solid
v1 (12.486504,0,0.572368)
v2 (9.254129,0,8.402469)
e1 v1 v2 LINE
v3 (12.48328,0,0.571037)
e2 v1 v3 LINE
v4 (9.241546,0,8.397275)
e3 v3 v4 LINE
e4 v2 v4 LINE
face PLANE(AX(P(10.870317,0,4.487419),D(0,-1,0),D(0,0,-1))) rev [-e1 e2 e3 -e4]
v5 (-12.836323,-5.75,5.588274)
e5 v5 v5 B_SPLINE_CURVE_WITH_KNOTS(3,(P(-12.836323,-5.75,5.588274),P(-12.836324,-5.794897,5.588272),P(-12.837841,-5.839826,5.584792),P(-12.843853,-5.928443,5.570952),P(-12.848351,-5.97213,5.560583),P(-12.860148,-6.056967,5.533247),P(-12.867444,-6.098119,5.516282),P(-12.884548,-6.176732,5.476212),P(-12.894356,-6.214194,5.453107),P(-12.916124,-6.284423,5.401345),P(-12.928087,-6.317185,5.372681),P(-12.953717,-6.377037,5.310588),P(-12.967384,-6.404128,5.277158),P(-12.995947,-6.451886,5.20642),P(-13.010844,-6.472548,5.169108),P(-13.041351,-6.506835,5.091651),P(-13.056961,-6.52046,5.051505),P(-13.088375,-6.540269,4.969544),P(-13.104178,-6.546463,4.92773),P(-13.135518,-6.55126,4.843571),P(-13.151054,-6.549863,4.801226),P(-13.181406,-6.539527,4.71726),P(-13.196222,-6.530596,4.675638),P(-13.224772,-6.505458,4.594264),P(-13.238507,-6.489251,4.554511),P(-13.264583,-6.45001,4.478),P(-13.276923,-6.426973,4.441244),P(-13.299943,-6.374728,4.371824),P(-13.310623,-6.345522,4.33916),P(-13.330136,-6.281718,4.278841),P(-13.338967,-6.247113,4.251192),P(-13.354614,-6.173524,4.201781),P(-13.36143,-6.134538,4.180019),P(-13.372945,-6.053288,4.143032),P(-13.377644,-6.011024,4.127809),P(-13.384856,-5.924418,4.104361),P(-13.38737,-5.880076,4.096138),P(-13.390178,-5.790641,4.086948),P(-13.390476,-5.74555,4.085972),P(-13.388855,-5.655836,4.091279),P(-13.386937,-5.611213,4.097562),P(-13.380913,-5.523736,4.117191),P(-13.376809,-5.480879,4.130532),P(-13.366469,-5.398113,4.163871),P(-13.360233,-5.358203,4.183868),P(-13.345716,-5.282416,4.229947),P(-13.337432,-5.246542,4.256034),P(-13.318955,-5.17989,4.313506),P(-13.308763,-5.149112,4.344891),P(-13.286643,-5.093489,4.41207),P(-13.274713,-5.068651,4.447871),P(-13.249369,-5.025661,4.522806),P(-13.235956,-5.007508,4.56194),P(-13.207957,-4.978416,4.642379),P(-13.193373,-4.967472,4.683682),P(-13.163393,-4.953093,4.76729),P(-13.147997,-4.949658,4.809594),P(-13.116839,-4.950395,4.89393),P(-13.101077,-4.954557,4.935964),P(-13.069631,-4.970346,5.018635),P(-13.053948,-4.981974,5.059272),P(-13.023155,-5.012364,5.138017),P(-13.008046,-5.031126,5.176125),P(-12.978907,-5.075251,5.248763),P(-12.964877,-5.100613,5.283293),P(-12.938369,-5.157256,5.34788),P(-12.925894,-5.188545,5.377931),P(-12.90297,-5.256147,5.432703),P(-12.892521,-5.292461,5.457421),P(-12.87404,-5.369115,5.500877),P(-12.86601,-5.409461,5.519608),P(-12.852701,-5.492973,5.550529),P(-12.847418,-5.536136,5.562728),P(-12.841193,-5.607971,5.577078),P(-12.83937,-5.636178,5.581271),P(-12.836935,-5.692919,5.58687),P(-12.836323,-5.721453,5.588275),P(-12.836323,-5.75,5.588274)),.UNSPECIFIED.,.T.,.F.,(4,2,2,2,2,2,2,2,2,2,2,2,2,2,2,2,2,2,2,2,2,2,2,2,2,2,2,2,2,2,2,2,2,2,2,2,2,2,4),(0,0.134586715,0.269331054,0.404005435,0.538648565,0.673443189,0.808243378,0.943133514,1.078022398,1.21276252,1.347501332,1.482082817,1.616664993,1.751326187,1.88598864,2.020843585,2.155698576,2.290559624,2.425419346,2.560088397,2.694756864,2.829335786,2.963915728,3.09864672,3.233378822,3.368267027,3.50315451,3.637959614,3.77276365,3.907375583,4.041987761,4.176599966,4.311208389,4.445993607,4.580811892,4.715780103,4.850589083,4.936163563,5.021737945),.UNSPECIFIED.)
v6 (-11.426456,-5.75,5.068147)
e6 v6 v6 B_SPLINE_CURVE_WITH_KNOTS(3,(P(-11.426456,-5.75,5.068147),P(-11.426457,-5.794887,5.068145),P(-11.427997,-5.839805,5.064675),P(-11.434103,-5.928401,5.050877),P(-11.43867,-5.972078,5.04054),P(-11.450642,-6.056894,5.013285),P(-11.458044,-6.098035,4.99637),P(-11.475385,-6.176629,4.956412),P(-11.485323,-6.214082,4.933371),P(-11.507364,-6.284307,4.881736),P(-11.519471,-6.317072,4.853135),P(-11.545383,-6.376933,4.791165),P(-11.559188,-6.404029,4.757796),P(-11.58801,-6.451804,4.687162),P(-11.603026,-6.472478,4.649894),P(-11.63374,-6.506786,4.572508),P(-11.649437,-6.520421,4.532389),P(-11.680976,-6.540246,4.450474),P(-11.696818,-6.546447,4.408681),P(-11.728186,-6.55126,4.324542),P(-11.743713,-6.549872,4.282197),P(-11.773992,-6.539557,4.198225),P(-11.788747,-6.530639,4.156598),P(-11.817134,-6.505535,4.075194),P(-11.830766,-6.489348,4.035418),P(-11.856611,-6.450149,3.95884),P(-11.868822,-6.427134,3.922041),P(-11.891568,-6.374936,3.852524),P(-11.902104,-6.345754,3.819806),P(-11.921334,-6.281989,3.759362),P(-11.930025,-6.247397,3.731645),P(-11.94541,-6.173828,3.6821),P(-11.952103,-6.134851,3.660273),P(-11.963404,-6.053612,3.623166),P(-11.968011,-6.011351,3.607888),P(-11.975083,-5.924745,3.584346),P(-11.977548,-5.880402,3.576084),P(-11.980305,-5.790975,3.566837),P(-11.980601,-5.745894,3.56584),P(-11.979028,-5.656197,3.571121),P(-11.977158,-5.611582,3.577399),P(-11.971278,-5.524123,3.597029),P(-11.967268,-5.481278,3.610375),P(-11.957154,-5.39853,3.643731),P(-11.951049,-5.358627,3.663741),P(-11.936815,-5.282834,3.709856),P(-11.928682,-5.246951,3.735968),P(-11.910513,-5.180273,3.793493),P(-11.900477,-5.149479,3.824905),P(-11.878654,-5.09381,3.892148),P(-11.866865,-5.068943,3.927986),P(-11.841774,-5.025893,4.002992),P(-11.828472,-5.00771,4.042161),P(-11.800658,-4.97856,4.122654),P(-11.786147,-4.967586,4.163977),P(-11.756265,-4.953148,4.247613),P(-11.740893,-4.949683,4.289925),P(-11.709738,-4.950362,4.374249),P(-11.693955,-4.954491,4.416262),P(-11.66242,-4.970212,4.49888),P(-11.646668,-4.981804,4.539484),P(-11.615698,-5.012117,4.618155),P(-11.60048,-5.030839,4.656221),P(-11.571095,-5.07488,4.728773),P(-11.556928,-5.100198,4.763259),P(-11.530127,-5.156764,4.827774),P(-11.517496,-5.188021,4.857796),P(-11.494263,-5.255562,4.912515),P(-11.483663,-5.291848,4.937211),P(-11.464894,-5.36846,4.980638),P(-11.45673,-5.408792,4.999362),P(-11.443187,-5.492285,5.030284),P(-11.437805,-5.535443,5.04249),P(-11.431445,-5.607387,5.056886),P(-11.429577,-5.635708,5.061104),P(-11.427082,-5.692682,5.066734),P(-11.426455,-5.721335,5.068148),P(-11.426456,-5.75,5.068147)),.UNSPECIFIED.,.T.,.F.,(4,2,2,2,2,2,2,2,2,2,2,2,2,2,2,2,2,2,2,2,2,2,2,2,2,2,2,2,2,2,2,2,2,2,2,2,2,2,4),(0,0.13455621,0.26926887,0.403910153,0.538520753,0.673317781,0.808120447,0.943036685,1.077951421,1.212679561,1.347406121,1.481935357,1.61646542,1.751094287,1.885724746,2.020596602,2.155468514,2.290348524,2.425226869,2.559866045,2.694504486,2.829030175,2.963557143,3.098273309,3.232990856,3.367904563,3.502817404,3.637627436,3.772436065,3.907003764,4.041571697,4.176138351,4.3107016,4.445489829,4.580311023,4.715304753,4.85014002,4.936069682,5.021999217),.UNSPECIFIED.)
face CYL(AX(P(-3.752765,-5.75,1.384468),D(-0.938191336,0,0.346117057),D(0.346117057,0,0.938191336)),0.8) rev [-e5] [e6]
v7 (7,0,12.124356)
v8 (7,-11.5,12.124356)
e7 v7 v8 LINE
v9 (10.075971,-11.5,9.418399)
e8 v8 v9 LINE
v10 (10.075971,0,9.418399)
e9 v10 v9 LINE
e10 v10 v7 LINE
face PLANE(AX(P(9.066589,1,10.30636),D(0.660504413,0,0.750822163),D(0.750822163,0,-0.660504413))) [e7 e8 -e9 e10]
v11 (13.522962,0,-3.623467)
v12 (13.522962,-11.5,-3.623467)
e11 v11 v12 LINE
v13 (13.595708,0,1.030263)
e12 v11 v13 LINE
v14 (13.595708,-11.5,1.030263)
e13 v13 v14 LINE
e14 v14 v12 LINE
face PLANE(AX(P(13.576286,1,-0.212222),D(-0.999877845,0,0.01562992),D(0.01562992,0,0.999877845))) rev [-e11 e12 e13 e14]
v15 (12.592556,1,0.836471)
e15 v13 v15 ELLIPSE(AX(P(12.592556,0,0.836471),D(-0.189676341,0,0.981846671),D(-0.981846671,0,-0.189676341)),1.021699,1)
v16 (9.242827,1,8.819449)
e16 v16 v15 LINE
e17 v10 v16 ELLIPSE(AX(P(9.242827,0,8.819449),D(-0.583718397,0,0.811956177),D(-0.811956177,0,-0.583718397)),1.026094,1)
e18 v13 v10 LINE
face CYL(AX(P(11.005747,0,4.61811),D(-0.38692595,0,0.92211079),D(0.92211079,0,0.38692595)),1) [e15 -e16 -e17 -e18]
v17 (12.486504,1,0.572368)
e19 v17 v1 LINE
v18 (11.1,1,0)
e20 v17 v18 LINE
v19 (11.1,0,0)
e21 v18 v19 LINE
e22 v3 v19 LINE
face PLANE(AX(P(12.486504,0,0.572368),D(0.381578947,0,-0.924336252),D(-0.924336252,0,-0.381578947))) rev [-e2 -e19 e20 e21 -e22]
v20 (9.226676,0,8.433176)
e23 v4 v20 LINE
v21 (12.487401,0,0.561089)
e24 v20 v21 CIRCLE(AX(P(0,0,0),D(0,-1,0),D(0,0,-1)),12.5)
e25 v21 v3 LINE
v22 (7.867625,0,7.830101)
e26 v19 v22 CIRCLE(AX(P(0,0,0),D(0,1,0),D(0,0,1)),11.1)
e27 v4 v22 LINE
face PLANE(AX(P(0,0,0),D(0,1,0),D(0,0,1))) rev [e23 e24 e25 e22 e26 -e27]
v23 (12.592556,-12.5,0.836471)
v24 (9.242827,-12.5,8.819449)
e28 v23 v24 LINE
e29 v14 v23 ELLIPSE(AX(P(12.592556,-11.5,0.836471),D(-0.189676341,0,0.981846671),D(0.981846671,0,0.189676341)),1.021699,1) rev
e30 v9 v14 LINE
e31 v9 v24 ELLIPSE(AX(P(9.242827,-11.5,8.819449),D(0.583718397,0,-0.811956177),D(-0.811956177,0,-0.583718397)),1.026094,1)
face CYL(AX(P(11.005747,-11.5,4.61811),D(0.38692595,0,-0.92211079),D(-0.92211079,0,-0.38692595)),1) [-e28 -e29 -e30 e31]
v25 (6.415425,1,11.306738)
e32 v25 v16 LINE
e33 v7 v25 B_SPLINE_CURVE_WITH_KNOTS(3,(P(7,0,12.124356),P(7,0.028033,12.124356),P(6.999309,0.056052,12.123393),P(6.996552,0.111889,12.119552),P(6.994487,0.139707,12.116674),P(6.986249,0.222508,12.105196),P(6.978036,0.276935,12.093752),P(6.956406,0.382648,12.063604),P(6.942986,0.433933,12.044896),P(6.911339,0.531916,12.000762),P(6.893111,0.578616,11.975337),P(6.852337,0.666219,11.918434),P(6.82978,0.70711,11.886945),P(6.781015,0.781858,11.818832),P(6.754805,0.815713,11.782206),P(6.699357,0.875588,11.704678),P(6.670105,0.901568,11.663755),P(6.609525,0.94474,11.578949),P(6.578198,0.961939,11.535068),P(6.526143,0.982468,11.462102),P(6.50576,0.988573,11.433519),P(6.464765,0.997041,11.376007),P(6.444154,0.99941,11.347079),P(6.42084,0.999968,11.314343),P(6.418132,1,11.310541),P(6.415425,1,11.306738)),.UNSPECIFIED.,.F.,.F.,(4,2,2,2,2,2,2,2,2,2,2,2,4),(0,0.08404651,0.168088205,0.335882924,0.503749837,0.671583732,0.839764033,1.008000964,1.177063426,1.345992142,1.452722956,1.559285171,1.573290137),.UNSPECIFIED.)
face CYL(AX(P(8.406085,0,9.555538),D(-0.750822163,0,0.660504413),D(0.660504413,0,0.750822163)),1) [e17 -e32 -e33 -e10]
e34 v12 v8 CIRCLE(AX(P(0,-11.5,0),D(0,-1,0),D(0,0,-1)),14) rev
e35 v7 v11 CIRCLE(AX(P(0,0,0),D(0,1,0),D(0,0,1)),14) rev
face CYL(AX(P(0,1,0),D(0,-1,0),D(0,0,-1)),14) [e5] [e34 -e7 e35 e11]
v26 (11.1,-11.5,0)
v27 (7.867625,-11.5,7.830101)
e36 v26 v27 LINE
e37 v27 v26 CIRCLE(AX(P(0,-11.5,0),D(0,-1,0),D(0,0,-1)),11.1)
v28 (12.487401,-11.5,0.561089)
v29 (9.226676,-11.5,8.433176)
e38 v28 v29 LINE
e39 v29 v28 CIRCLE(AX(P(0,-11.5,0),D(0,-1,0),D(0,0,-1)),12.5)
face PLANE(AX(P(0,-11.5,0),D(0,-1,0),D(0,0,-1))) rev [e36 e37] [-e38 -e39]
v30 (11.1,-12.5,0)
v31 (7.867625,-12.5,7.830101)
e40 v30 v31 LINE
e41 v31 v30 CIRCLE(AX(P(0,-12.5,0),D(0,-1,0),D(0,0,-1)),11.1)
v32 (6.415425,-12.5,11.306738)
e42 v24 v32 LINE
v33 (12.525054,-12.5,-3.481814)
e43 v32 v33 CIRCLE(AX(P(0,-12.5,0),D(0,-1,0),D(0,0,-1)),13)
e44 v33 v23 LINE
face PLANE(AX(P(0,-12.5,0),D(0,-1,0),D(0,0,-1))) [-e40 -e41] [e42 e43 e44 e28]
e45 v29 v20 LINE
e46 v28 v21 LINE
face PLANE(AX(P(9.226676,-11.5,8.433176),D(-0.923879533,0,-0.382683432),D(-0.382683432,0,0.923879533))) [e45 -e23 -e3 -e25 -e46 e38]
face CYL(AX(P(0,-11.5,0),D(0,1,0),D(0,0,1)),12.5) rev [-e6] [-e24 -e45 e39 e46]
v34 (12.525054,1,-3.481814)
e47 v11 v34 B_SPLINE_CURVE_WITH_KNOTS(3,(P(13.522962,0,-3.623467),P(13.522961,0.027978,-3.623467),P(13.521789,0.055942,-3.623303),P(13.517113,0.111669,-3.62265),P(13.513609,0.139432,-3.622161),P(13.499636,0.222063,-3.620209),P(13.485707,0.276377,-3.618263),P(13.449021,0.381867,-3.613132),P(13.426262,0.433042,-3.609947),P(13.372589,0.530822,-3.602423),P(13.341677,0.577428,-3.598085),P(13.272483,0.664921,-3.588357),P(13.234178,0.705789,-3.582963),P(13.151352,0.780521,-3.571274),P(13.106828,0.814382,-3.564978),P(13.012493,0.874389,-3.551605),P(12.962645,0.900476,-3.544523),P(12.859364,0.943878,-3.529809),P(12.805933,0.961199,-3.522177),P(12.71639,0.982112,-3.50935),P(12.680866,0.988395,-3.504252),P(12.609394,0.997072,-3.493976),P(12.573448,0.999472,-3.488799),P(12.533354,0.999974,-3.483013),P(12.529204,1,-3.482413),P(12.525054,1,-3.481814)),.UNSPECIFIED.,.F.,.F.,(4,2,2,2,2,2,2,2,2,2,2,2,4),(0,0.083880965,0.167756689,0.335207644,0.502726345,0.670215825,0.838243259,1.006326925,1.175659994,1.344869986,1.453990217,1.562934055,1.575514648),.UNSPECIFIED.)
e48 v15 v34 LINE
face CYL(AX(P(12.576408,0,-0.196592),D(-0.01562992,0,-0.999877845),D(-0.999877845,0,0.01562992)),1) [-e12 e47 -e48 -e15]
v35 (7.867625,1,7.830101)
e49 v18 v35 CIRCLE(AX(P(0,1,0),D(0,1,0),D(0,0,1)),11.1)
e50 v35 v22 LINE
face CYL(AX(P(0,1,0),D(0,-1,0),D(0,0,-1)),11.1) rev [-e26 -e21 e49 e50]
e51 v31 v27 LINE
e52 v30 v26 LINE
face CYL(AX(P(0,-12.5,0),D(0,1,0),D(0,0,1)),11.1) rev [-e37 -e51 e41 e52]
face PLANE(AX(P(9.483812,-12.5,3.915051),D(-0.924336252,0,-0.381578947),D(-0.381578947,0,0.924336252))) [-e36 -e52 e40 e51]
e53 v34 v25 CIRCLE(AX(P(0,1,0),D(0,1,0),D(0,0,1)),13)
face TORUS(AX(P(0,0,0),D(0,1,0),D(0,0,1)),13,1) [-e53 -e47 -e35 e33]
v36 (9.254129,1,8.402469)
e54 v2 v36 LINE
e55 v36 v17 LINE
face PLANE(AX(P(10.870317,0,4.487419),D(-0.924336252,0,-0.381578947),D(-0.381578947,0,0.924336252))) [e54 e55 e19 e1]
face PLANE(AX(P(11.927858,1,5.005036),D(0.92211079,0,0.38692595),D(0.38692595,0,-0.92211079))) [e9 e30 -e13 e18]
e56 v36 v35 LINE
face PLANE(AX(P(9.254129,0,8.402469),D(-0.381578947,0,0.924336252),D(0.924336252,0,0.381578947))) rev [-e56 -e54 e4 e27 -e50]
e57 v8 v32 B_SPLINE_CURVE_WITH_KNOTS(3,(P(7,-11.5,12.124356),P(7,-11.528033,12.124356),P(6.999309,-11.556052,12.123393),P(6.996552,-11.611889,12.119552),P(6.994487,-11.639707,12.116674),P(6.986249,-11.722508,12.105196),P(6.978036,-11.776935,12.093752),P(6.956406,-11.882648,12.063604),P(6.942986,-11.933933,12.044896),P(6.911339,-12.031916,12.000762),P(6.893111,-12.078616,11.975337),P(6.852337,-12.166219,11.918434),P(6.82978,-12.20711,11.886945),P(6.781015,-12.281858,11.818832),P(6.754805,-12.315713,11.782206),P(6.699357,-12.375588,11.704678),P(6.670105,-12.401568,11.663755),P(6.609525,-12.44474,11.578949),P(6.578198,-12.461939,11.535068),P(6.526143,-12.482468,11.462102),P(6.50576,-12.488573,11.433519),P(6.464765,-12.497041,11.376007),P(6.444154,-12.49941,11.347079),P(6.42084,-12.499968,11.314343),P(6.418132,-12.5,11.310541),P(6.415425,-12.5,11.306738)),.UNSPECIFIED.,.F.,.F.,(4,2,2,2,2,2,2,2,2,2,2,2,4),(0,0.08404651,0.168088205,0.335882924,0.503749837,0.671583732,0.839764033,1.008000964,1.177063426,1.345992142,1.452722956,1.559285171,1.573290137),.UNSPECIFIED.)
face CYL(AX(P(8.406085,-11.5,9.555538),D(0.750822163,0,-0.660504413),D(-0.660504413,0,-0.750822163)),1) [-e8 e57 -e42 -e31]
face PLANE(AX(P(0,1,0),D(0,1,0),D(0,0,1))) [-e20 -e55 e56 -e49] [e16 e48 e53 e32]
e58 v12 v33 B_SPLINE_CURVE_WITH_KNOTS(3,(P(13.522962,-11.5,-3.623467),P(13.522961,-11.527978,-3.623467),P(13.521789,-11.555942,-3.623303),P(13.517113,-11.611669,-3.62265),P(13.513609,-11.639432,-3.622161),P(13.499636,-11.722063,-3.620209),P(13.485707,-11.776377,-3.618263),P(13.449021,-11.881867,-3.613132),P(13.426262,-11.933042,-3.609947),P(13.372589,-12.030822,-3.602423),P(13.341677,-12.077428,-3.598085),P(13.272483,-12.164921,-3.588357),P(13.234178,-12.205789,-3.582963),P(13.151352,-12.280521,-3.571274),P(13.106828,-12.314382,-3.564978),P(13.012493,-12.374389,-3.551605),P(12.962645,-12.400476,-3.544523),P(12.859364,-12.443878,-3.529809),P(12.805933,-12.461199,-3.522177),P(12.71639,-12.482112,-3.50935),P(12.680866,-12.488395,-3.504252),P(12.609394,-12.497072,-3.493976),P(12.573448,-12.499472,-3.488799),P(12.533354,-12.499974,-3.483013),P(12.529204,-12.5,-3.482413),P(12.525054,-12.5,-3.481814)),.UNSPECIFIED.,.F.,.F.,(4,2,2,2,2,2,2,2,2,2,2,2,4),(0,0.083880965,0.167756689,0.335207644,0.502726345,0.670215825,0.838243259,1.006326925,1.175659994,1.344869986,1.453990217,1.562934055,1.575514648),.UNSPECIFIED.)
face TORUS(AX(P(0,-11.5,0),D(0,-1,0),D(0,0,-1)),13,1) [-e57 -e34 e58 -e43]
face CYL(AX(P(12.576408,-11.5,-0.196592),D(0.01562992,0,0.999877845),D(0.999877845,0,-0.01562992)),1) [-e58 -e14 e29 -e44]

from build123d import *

# Parameters (mm, degrees)
EXTRUDE_1_DEPTH     = 1
EXTRUDE_START       = 11.5
EXTRUDE_3_DEPTH     = 11.5
EXTRUDE_START_2     = 1
EXTRUDE_4_DEPTH     = 1
FILLET_1_R          = 1
FILLET_2_R          = 1
SKETCH_7_W          = 8.471052631578948
SKETCH_7_H          = 1
CUT_EXTRUDE_1_DEPTH = 1.5
SKETCH2_R           = 0.8000000000000002
CUT_EXTRUDE1_DEPTH  = 10


with BuildPart() as part:
    # 草图1 → 凸台-拉伸1 (new body)
    with BuildSketch(Plane(origin=(0, 0, 0), x_dir=(1, 0, 0), z_dir=(0, 1, 0))):
        with BuildLine():
            Line((13.595707880639235, -1.030263157894738), (10.075971038533972, -9.418398712579371))
            Line((10.075971038533972, -9.418398712579371), (7, -12.12435565298214))
            ThreePointArc((7, -12.12435565298214), (-12.93431345515802, 5.357568053111247), (13.522961568046952, 3.6234666314353032))
            Line((13.522961568046952, 3.6234666314353032), (13.595707880639235, -1.030263157894738))
        make_face()
        with BuildLine():
            Line((11.1, 0), (7.867624653739615, -7.830101040718992))
            ThreePointArc((7.867624653739615, -7.830101040718992), (-10.260132398183506, 4.235526315789474), (11.1, 0))
        make_face(mode=Mode.SUBTRACT)
    extrude(amount=EXTRUDE_1_DEPTH)

    # 草图2 → 凸台-拉伸3 (add)
    with BuildSketch(Plane(origin=(0, 0, 0), x_dir=(-1, 0, 0), z_dir=(0, -1, 0)).offset(EXTRUDE_START)):
        with BuildLine():
            Line((-13.595707880639234, -1.030263157894738), (-13.52296156804698, 3.6234666314351993))
            ThreePointArc((-13.52296156804698, 3.6234666314351993), (12.934313455157998, 5.357568053111296), (-7, -12.12435565298214))
            Line((-7, -12.12435565298214), (-10.07597103853397, -9.418398712579371))
            Line((-10.07597103853397, -9.418398712579371), (-13.595707880639234, -1.030263157894738))
        make_face()
        with BuildLine():
            Line((-9.226675534749763, -8.43317606696612), (-12.487400822321415, -0.5610888545377466))
            ThreePointArc((-12.487400822321415, -0.5610888545377466), (11.548494156391081, 4.783542904563626), (-9.226675534749763, -8.43317606696612))
        make_face(mode=Mode.SUBTRACT)
    extrude(amount=-EXTRUDE_3_DEPTH)

    # 草图5 → 凸台-拉伸4 (add)
    with BuildSketch(Plane(origin=(0, -11.5, 0), x_dir=(-1, 0, 0), z_dir=(0, -1, 0)).offset(EXTRUDE_START_2)):
        with BuildLine():
            Line((-13.522961568046979, 3.6234666314352), (-13.595707880639234, -1.030263157894738))
            Line((-13.595707880639234, -1.030263157894738), (-10.07597103853397, -9.418398712579371))
            Line((-10.07597103853397, -9.418398712579371), (-7.0000000000000115, -12.124355652982132))
            ThreePointArc((-7.0000000000000115, -12.124355652982132), (12.934313455157996, 5.3575680531112955), (-13.522961568046979, 3.6234666314352))
        make_face()
        with BuildLine():
            Line((-11.099999999999998, 0), (-7.867624653739613, -7.830101040718992))
            ThreePointArc((-7.867624653739613, -7.830101040718992), (10.260132398183506, 4.235526315789473), (-11.099999999999998, 0))
        make_face(mode=Mode.SUBTRACT)
    extrude(amount=-EXTRUDE_4_DEPTH)

    # 圆角1
    # the kernel refuses this fillet: 1 mm, written as the material it takes off along each edge
    with BuildSketch(Plane(origin=(11.953026446892592, -12.5, 7.767137681139568), x_dir=(-0.6605044125759219, 0, -0.7508221633434488), z_dir=(-0.7508221633434488, 0, 0.6605044125759219))) as fillet_1_piece_1:
        with BuildLine():
            CenterArc((FILLET_1_R, -FILLET_1_R), FILLET_1_R, 90, 90)
            Line((-1.17e-15, -FILLET_1_R), (0, 0))
            Line((0, 0), (FILLET_1_R, 0))
        make_face()
    extrude(amount=9.096803728910325, mode=Mode.SUBTRACT)
    with BuildSketch(Plane(origin=(1.33e-15, -12.5, -1.33e-15), x_dir=(0.6464264276811541, 0, 0.7629763257109501), z_dir=(0.7629763257109501, 0, -0.6464264276811541))) as fillet_1_piece_2:
        with BuildLine():
            CenterArc((14.000000000000002 - FILLET_1_R, -FILLET_1_R), FILLET_1_R, 0, 89.9999999999999)
            Line((14.000000000000002 - FILLET_1_R, 0), (14.000000000000002, 0))
            Line((14.000000000000002, 0), (14.000000000000002, -FILLET_1_R))
        make_face()
    revolve(axis=Axis((1.33e-15, -12.5, -1.33e-15), (0, -1, 0)), revolution_arc=305.54541710396313, mode=Mode.SUBTRACT)
    with BuildSketch(Plane(origin=(13.483886766982303, -12.5, -6.123161244767347), x_dir=(-1e-17, 1, 0), z_dir=(0.015629920425854232, 0, 0.9998778453328594))) as fillet_1_piece_3:
        with BuildLine():
            CenterArc((FILLET_1_R, FILLET_1_R), FILLET_1_R, 180, 90)
            Line((1e-17, FILLET_1_R), (0, 0))
            Line((0, 0), (FILLET_1_R, 0))
        make_face()
    extrude(amount=9.654298333593651, mode=Mode.SUBTRACT)
    with BuildSketch(Plane(origin=(14.563022756193803, -12.5, -1.275013817119511), x_dir=(9.6e-16, 1, 4e-16), z_dir=(-0.386925950221828, 0, 0.9221107900056997))) as fillet_1_piece_4:
        with BuildLine():
            CenterArc((FILLET_1_R, FILLET_1_R), FILLET_1_R, 180, 90.00000000000006)
            Line((-1.04e-15, FILLET_1_R), (0, 0))
            Line((0, 0), (FILLET_1_R, 0))
        make_face()
    extrude(amount=14.0966678251675, mode=Mode.SUBTRACT)

    # 圆角2
    # the kernel refuses this fillet: 1 mm, written as the material it takes off along each edge
    with BuildSketch(Plane(origin=(13.483886766982302, 1, -6.123161244767451), x_dir=(-1e-17, -1, 0), z_dir=(0.01562992042585999, 0, 0.9998778453328593))) as fillet_2_piece_1:
        with BuildLine():
            CenterArc((FILLET_2_R, -FILLET_2_R), FILLET_2_R, 90, 90)
            Line((1e-17, -FILLET_2_R), (0, 0))
            Line((0, 0), (FILLET_2_R, 0))
        make_face()
    extrude(amount=9.654298333593754, mode=Mode.SUBTRACT)
    with BuildSketch(Plane(origin=(-1.19e-15, 1, 1.55e-15), x_dir=(0.6464264276811535, 0, 0.7629763257109505), z_dir=(0.7629763257109505, 0, -0.6464264276811535))) as fillet_2_piece_2:
        with BuildLine():
            CenterArc((14.000000000000002 - FILLET_2_R, FILLET_2_R), FILLET_2_R, 270, 90)
            Line((14.000000000000002 - FILLET_2_R, 0), (14.000000000000002, 0))
            Line((14.000000000000002, 0), (14.000000000000002, FILLET_2_R))
        make_face()
    revolve(axis=Axis((-1.19e-15, 1, 1.55e-15), (0, -1, 0)), revolution_arc=305.54541710396273, mode=Mode.SUBTRACT)
    with BuildSketch(Plane(origin=(11.953026446892594, 1, 7.767137681139568), x_dir=(-0.6605044125759215, 0, -0.7508221633434492), z_dir=(-0.7508221633434492, 0, 0.6605044125759215))) as fillet_2_piece_3:
        with BuildLine():
            CenterArc((FILLET_2_R, FILLET_2_R), FILLET_2_R, 180, 90)
            Line((6.7e-16, FILLET_2_R), (0, 0))
            Line((0, 0), (FILLET_2_R, 0))
        make_face()
    extrude(amount=9.096803728910341, mode=Mode.SUBTRACT)
    with BuildSketch(Plane(origin=(14.563022756193805, 1, -1.2750138171195122), x_dir=(-0.9221107900056996, 0, -0.38692595022182796), z_dir=(-0.386925950221828, 0, 0.9221107900056997))) as fillet_2_piece_4:
        with BuildLine():
            CenterArc((FILLET_2_R, FILLET_2_R), FILLET_2_R, 180, 90)
            Line((-1e-17, FILLET_2_R), (0, 0))
            Line((0, 0), (FILLET_2_R, 0))
        make_face()
    extrude(amount=14.096667825167504, mode=Mode.SUBTRACT)

    # 草图7 → 切除-拉伸1 (cut)
    with BuildSketch(Plane(origin=(9.483812326869804, 0, 3.915050520359493), x_dir=(-0.3815789473684208, 0, 0.9243362520886044), z_dir=(-0.9243362520886044, 0, -0.3815789473684208))):
        with Locations((2.66e-15, 0.5)):
            Rectangle(SKETCH_7_W, SKETCH_7_H)
    extrude(amount=-CUT_EXTRUDE_1_DEPTH, mode=Mode.SUBTRACT)

    # Sketch2 → Cut-Extrude1 (cut)
    with BuildSketch(Plane(origin=(-13.134678702914778, 0, 4.845638799084908), x_dir=(0.3461170570774934, 0, 0.938191335922484), z_dir=(-0.938191335922484, 0, 0.34611705707749346))):
        with Locations((0, -5.75)):
            Circle(SKETCH2_R)
    extrude(amount=-CUT_EXTRUDE1_DEPTH, mode=Mode.SUBTRACT)


solid = part.part
